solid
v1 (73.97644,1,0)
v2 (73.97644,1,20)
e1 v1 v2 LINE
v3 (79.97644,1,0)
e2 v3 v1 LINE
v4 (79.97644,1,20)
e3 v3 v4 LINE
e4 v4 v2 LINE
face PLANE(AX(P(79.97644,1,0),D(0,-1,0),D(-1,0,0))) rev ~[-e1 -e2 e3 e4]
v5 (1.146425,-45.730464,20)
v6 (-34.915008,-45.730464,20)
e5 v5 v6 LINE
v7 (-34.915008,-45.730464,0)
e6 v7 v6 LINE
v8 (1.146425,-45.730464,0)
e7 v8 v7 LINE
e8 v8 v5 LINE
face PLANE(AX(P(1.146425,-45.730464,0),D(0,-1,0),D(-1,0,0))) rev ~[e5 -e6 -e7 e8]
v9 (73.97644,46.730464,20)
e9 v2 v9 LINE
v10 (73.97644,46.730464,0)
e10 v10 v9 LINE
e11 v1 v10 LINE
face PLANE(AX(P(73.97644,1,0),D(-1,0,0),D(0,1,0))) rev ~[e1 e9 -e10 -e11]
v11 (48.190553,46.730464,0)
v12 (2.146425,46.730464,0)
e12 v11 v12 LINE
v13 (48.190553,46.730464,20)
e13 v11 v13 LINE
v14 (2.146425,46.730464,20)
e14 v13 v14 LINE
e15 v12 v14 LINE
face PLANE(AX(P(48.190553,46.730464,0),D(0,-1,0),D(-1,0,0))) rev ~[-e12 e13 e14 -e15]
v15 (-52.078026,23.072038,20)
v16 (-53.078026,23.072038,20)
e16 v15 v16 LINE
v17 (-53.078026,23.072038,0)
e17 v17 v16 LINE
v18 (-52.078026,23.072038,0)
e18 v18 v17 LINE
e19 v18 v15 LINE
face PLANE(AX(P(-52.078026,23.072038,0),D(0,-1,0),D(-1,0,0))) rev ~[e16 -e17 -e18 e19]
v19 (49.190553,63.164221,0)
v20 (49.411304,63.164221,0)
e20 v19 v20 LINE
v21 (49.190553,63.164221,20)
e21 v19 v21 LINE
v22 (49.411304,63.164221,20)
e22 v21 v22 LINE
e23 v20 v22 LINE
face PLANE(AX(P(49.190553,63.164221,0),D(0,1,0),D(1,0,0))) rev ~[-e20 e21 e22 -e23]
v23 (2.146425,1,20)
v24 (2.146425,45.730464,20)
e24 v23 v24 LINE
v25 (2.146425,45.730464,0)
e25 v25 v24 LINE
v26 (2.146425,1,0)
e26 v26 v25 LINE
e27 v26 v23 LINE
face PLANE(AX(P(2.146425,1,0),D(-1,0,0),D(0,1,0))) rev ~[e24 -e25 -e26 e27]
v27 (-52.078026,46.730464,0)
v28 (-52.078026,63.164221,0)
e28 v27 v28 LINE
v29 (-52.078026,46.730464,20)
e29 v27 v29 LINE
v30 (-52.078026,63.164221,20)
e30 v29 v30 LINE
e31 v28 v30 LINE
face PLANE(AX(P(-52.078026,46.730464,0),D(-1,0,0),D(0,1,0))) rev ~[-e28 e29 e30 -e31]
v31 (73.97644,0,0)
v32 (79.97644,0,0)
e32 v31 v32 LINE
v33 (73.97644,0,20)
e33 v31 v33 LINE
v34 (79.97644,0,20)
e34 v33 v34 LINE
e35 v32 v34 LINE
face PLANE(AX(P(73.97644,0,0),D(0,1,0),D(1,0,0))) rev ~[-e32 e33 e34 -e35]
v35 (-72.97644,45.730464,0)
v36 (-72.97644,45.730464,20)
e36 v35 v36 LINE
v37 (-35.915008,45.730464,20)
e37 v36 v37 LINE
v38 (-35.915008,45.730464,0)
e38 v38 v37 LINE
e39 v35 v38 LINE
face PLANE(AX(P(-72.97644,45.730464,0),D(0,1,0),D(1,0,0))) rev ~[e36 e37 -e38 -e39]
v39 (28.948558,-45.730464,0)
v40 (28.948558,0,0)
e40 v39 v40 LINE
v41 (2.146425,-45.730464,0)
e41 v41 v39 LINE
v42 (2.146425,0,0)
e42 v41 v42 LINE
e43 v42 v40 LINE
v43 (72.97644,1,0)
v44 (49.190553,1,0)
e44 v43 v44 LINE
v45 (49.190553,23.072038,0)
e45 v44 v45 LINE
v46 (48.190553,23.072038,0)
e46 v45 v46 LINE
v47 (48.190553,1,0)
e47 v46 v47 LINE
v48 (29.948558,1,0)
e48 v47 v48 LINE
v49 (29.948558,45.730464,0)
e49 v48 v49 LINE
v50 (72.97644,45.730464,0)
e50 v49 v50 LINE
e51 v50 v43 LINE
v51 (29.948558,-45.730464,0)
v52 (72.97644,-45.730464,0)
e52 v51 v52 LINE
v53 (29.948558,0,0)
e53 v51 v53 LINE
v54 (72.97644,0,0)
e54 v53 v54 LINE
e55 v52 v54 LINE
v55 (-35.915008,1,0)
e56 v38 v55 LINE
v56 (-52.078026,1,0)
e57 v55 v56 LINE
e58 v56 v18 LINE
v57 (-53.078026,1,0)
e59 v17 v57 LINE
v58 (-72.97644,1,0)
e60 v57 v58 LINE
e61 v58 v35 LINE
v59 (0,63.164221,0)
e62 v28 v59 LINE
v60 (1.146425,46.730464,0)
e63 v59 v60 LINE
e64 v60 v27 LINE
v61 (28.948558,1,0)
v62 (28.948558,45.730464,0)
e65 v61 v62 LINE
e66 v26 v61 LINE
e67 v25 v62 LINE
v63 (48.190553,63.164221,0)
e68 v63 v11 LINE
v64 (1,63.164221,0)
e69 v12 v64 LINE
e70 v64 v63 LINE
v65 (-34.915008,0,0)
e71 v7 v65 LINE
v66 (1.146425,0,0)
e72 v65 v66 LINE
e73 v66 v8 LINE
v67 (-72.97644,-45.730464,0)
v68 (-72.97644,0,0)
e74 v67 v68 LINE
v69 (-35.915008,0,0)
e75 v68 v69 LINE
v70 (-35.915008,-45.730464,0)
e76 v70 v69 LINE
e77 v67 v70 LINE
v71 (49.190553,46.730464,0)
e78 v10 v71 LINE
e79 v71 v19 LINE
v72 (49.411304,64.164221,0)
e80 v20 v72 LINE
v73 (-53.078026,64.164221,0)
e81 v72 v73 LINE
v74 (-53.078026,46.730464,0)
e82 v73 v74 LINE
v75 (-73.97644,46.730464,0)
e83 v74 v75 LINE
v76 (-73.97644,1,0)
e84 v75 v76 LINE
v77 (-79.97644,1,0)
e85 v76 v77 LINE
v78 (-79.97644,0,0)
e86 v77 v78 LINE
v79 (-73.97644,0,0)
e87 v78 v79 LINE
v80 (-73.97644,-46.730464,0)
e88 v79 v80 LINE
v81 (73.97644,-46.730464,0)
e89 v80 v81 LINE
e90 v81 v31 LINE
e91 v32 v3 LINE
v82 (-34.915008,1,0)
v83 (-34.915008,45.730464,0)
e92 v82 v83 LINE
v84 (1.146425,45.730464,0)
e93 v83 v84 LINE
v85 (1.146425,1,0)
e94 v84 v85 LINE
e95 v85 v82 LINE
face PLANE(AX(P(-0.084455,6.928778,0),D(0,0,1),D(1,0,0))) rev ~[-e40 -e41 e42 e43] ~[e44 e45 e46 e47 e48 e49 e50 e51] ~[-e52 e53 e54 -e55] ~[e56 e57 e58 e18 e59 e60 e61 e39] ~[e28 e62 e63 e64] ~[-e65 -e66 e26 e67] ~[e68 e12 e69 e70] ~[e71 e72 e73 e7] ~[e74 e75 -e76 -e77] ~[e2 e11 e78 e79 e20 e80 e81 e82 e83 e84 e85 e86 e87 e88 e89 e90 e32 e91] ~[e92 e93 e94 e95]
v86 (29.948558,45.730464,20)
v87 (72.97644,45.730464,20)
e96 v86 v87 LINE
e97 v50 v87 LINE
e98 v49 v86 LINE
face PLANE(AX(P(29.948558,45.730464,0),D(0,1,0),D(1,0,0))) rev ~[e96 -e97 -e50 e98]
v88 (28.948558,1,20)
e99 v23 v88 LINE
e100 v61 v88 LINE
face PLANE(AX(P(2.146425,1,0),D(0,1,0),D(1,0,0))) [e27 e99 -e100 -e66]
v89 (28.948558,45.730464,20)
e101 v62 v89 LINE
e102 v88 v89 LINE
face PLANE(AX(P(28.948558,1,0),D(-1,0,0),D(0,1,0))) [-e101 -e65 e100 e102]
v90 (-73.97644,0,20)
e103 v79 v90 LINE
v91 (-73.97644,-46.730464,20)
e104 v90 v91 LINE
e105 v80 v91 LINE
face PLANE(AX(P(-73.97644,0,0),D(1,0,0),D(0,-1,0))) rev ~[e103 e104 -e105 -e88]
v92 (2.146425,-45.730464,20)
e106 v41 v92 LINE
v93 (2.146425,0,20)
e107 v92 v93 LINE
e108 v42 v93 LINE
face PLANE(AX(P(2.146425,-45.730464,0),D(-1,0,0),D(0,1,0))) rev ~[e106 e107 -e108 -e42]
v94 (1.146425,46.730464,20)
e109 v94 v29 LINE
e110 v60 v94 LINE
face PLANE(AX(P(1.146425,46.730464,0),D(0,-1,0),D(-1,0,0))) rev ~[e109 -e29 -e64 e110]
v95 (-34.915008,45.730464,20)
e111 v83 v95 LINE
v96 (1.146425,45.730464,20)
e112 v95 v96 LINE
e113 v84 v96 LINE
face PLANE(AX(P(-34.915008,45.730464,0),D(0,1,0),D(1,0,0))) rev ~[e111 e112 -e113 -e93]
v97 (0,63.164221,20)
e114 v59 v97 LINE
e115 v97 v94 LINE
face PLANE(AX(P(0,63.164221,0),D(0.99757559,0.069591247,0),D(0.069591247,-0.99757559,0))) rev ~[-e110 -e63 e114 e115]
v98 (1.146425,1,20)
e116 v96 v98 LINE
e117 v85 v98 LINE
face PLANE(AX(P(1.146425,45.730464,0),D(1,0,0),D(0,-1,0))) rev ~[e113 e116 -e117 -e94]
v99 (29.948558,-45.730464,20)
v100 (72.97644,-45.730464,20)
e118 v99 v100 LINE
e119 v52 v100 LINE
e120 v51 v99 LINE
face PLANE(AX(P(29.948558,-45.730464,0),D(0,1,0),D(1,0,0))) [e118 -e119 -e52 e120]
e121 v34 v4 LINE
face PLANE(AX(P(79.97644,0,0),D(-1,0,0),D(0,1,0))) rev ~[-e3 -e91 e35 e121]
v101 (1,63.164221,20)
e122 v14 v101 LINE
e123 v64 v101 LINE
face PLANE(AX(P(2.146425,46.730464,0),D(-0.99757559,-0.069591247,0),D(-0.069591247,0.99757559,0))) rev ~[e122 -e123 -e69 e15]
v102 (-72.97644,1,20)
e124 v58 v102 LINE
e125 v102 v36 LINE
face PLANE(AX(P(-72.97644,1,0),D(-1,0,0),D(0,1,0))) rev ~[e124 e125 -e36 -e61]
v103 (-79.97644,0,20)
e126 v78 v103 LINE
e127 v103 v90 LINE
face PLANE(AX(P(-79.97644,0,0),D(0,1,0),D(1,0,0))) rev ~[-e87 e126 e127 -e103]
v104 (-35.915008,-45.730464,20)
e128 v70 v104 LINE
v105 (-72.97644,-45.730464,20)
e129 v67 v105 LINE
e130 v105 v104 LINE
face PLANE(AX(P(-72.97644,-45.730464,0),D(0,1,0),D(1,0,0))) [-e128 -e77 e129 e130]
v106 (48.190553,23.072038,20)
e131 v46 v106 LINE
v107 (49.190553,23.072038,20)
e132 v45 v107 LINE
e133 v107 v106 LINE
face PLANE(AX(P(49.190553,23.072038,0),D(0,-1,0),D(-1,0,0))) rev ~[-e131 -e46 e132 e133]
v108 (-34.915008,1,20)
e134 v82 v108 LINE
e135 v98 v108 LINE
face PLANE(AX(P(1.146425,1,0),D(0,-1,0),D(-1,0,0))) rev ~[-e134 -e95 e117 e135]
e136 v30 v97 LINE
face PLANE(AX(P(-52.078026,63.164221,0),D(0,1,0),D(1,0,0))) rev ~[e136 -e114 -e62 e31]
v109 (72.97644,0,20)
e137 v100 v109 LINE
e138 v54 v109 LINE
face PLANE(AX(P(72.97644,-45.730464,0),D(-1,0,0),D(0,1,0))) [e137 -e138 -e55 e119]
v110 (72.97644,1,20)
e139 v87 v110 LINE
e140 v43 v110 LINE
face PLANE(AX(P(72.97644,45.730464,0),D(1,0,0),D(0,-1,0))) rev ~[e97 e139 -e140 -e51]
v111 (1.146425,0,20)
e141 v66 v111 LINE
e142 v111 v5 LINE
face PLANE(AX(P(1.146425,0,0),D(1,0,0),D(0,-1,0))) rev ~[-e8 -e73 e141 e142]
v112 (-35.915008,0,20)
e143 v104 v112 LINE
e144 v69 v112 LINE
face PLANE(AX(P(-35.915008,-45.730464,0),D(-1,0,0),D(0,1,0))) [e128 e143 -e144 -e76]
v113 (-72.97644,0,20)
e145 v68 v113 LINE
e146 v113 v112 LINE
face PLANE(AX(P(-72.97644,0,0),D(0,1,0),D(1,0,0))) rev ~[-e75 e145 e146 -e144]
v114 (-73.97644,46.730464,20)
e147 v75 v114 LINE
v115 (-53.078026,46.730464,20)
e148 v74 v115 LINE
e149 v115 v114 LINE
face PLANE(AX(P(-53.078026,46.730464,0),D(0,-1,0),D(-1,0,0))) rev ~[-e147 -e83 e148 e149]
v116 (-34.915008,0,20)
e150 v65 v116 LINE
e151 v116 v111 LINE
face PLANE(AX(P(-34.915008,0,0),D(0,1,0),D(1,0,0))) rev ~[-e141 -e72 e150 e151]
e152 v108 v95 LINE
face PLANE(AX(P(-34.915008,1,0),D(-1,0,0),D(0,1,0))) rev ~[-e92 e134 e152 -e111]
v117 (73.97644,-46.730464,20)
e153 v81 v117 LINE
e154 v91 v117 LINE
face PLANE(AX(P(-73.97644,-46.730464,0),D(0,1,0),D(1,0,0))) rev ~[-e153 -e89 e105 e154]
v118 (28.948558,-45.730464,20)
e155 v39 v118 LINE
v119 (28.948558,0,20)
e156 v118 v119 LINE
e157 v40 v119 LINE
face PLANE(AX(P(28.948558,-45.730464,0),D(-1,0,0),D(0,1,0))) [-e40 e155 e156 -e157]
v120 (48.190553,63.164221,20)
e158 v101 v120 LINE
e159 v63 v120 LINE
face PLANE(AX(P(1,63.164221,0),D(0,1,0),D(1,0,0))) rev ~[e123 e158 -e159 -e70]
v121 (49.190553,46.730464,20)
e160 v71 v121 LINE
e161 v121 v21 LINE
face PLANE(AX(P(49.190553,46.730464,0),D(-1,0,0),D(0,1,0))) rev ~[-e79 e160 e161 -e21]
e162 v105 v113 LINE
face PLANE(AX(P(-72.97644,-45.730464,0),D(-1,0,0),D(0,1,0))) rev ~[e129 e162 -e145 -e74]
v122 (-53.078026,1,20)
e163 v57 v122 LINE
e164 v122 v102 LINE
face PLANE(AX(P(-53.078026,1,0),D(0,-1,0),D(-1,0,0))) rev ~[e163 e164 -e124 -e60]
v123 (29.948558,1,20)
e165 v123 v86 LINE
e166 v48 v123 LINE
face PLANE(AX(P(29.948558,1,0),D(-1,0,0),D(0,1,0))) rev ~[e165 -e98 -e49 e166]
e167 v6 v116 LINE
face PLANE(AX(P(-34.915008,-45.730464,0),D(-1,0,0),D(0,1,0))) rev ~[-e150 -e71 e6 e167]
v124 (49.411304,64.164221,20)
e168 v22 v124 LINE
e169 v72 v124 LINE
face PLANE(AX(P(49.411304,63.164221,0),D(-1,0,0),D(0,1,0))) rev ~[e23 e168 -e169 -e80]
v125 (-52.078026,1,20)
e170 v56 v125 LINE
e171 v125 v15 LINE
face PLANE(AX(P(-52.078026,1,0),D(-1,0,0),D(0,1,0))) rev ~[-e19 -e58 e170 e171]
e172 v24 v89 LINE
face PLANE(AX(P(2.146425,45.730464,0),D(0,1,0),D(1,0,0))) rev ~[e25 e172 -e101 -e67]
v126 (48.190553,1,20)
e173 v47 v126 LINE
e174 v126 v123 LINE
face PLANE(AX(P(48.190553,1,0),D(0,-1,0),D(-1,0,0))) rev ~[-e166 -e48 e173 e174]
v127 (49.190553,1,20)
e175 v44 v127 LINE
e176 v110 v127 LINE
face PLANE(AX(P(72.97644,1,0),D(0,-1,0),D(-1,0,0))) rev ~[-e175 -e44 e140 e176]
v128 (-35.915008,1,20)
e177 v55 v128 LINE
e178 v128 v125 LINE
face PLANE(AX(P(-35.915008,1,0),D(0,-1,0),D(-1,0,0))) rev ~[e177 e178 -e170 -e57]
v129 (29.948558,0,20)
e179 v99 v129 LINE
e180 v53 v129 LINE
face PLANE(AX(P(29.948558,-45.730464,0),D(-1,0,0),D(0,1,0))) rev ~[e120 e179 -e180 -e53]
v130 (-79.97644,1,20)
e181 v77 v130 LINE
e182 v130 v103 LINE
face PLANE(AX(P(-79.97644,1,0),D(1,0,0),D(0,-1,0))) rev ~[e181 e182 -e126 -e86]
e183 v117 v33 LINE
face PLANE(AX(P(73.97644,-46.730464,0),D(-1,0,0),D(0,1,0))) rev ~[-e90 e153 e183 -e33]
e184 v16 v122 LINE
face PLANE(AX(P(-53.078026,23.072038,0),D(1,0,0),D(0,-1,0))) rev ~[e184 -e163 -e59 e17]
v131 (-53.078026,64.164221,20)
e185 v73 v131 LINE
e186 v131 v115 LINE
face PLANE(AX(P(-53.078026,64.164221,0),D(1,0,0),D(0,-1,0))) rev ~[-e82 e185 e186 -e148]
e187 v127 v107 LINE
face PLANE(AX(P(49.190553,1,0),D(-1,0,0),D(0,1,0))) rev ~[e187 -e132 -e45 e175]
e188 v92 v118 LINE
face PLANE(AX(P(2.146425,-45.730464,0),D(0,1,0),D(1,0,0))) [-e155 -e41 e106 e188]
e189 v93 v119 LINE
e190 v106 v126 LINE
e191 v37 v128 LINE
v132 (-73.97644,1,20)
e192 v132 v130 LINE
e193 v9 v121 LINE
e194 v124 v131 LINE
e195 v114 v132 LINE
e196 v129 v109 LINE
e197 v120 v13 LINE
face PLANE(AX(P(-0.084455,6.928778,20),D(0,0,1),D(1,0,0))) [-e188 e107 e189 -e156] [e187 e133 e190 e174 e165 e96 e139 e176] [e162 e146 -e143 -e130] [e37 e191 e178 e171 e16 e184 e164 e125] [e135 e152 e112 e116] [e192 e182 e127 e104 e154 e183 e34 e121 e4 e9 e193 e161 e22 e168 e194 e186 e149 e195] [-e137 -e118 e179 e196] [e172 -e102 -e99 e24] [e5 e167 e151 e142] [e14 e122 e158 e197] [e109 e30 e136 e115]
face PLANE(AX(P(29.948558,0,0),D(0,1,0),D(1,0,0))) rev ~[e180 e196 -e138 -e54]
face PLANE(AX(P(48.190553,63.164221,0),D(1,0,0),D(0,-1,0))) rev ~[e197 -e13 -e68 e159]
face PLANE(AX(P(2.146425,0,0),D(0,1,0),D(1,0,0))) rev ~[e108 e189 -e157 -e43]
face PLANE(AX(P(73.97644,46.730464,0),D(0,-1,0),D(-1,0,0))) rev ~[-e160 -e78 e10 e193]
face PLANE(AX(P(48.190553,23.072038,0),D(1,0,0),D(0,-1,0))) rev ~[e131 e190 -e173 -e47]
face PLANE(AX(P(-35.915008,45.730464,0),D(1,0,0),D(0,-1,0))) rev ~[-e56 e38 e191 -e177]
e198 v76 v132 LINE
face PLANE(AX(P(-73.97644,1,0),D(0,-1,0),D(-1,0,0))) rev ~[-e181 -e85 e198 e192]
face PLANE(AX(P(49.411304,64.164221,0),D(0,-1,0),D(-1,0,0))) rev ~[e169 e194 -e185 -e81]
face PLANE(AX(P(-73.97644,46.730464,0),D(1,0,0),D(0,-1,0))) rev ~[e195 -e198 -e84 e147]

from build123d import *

# Parameters (mm, degrees)
F0_W     = 37.0614326914
F0_H     = 45.7304640924
F0_W_2   = 26.8021334539
F0_W_3   = 43.0278818478
F0_H_2   = 44.7304640924
F1_DEPTH = 20


with BuildPart() as f1:
    # F0 (on Top) → F1 (new body)
    with BuildSketch(Plane.XY):
        Polygon((73.9764403422, 1), (73.9764403422, 46.7304640924), (49.1905527413, 46.7304640924), (49.1905527413, 63.1642210121), (49.4113042951, 63.1642210121), (49.4113042951, 64.1642210121), (-53.0780255795, 64.1642210121), (-53.0780255795, 63.1642210121), (-53.0780255795, 46.7304640924), (-73.9764403422, 46.7304640924), (-73.9764403422, 1), (-79.9764403422, 1), (-79.9764403422, 0), (-73.9764403422, 0), (-73.9764403422, -46.7304640924), (73.9764403422, -46.7304640924), (73.9764403422, 0), (79.9764403422, 0), (79.9764403422, 1), align=None)
        with Locations((-54.4457239965, -22.8652320462)):
            Rectangle(F0_W, F0_H, mode=Mode.SUBTRACT)
        Polygon((-34.9150076509, 45.7304640924), (1.1464250405, 45.7304640924), (1.1464250405, 1), (1.1464250405, 0), (1.1464250405, -45.7304640924), (-34.9150076509, -45.7304640924), (-34.9150076509, 0), (-34.9150076509, 1), align=None, mode=Mode.SUBTRACT)
        with Locations((15.5474917675, -22.8652320462)):
            Rectangle(F0_W_2, F0_H, mode=Mode.SUBTRACT)
        with Locations((51.4624994183, -22.8652320462)):
            Rectangle(F0_W_3, F0_H, mode=Mode.SUBTRACT)
        Polygon((-72.9764403422, 1), (-72.9764403422, 45.7304640924), (-35.9150076509, 45.7304640924), (-35.9150076509, 1), (-52.0780255795, 1), (-52.0780255795, 23.0720378458), (-53.0780255795, 23.0720378458), (-53.0780255795, 1), align=None, mode=Mode.SUBTRACT)
        Polygon((-52.0780255795, 63.1642210121), (0, 63.1642210121), (1.1464250405, 46.7304640924), (-52.0780255795, 46.7304640924), align=None, mode=Mode.SUBTRACT)
        with Locations((15.5474917675, 23.3652320462)):
            Rectangle(F0_W_2, F0_H_2, mode=Mode.SUBTRACT)
        Polygon((29.9485584944, 1), (29.9485584944, 45.7304640924), (72.9764403422, 45.7304640924), (72.9764403422, 1), (49.1905527413, 1), (49.1905527413, 23.0720378458), (48.1905527413, 23.0720378458), (48.1905527413, 1), align=None, mode=Mode.SUBTRACT)
        Polygon((1, 63.1642210121), (48.1905527413, 63.1642210121), (48.1905527413, 46.7304640924), (2.1464250405, 46.7304640924), align=None, mode=Mode.SUBTRACT)
        Polygon((1.1464250405, 0), (1.1464250405, 1), (-34.9150076509, 1), (-34.9150076509, 0), (0, 0), align=None)
    extrude(amount=F1_DEPTH)


solid = f1.part
